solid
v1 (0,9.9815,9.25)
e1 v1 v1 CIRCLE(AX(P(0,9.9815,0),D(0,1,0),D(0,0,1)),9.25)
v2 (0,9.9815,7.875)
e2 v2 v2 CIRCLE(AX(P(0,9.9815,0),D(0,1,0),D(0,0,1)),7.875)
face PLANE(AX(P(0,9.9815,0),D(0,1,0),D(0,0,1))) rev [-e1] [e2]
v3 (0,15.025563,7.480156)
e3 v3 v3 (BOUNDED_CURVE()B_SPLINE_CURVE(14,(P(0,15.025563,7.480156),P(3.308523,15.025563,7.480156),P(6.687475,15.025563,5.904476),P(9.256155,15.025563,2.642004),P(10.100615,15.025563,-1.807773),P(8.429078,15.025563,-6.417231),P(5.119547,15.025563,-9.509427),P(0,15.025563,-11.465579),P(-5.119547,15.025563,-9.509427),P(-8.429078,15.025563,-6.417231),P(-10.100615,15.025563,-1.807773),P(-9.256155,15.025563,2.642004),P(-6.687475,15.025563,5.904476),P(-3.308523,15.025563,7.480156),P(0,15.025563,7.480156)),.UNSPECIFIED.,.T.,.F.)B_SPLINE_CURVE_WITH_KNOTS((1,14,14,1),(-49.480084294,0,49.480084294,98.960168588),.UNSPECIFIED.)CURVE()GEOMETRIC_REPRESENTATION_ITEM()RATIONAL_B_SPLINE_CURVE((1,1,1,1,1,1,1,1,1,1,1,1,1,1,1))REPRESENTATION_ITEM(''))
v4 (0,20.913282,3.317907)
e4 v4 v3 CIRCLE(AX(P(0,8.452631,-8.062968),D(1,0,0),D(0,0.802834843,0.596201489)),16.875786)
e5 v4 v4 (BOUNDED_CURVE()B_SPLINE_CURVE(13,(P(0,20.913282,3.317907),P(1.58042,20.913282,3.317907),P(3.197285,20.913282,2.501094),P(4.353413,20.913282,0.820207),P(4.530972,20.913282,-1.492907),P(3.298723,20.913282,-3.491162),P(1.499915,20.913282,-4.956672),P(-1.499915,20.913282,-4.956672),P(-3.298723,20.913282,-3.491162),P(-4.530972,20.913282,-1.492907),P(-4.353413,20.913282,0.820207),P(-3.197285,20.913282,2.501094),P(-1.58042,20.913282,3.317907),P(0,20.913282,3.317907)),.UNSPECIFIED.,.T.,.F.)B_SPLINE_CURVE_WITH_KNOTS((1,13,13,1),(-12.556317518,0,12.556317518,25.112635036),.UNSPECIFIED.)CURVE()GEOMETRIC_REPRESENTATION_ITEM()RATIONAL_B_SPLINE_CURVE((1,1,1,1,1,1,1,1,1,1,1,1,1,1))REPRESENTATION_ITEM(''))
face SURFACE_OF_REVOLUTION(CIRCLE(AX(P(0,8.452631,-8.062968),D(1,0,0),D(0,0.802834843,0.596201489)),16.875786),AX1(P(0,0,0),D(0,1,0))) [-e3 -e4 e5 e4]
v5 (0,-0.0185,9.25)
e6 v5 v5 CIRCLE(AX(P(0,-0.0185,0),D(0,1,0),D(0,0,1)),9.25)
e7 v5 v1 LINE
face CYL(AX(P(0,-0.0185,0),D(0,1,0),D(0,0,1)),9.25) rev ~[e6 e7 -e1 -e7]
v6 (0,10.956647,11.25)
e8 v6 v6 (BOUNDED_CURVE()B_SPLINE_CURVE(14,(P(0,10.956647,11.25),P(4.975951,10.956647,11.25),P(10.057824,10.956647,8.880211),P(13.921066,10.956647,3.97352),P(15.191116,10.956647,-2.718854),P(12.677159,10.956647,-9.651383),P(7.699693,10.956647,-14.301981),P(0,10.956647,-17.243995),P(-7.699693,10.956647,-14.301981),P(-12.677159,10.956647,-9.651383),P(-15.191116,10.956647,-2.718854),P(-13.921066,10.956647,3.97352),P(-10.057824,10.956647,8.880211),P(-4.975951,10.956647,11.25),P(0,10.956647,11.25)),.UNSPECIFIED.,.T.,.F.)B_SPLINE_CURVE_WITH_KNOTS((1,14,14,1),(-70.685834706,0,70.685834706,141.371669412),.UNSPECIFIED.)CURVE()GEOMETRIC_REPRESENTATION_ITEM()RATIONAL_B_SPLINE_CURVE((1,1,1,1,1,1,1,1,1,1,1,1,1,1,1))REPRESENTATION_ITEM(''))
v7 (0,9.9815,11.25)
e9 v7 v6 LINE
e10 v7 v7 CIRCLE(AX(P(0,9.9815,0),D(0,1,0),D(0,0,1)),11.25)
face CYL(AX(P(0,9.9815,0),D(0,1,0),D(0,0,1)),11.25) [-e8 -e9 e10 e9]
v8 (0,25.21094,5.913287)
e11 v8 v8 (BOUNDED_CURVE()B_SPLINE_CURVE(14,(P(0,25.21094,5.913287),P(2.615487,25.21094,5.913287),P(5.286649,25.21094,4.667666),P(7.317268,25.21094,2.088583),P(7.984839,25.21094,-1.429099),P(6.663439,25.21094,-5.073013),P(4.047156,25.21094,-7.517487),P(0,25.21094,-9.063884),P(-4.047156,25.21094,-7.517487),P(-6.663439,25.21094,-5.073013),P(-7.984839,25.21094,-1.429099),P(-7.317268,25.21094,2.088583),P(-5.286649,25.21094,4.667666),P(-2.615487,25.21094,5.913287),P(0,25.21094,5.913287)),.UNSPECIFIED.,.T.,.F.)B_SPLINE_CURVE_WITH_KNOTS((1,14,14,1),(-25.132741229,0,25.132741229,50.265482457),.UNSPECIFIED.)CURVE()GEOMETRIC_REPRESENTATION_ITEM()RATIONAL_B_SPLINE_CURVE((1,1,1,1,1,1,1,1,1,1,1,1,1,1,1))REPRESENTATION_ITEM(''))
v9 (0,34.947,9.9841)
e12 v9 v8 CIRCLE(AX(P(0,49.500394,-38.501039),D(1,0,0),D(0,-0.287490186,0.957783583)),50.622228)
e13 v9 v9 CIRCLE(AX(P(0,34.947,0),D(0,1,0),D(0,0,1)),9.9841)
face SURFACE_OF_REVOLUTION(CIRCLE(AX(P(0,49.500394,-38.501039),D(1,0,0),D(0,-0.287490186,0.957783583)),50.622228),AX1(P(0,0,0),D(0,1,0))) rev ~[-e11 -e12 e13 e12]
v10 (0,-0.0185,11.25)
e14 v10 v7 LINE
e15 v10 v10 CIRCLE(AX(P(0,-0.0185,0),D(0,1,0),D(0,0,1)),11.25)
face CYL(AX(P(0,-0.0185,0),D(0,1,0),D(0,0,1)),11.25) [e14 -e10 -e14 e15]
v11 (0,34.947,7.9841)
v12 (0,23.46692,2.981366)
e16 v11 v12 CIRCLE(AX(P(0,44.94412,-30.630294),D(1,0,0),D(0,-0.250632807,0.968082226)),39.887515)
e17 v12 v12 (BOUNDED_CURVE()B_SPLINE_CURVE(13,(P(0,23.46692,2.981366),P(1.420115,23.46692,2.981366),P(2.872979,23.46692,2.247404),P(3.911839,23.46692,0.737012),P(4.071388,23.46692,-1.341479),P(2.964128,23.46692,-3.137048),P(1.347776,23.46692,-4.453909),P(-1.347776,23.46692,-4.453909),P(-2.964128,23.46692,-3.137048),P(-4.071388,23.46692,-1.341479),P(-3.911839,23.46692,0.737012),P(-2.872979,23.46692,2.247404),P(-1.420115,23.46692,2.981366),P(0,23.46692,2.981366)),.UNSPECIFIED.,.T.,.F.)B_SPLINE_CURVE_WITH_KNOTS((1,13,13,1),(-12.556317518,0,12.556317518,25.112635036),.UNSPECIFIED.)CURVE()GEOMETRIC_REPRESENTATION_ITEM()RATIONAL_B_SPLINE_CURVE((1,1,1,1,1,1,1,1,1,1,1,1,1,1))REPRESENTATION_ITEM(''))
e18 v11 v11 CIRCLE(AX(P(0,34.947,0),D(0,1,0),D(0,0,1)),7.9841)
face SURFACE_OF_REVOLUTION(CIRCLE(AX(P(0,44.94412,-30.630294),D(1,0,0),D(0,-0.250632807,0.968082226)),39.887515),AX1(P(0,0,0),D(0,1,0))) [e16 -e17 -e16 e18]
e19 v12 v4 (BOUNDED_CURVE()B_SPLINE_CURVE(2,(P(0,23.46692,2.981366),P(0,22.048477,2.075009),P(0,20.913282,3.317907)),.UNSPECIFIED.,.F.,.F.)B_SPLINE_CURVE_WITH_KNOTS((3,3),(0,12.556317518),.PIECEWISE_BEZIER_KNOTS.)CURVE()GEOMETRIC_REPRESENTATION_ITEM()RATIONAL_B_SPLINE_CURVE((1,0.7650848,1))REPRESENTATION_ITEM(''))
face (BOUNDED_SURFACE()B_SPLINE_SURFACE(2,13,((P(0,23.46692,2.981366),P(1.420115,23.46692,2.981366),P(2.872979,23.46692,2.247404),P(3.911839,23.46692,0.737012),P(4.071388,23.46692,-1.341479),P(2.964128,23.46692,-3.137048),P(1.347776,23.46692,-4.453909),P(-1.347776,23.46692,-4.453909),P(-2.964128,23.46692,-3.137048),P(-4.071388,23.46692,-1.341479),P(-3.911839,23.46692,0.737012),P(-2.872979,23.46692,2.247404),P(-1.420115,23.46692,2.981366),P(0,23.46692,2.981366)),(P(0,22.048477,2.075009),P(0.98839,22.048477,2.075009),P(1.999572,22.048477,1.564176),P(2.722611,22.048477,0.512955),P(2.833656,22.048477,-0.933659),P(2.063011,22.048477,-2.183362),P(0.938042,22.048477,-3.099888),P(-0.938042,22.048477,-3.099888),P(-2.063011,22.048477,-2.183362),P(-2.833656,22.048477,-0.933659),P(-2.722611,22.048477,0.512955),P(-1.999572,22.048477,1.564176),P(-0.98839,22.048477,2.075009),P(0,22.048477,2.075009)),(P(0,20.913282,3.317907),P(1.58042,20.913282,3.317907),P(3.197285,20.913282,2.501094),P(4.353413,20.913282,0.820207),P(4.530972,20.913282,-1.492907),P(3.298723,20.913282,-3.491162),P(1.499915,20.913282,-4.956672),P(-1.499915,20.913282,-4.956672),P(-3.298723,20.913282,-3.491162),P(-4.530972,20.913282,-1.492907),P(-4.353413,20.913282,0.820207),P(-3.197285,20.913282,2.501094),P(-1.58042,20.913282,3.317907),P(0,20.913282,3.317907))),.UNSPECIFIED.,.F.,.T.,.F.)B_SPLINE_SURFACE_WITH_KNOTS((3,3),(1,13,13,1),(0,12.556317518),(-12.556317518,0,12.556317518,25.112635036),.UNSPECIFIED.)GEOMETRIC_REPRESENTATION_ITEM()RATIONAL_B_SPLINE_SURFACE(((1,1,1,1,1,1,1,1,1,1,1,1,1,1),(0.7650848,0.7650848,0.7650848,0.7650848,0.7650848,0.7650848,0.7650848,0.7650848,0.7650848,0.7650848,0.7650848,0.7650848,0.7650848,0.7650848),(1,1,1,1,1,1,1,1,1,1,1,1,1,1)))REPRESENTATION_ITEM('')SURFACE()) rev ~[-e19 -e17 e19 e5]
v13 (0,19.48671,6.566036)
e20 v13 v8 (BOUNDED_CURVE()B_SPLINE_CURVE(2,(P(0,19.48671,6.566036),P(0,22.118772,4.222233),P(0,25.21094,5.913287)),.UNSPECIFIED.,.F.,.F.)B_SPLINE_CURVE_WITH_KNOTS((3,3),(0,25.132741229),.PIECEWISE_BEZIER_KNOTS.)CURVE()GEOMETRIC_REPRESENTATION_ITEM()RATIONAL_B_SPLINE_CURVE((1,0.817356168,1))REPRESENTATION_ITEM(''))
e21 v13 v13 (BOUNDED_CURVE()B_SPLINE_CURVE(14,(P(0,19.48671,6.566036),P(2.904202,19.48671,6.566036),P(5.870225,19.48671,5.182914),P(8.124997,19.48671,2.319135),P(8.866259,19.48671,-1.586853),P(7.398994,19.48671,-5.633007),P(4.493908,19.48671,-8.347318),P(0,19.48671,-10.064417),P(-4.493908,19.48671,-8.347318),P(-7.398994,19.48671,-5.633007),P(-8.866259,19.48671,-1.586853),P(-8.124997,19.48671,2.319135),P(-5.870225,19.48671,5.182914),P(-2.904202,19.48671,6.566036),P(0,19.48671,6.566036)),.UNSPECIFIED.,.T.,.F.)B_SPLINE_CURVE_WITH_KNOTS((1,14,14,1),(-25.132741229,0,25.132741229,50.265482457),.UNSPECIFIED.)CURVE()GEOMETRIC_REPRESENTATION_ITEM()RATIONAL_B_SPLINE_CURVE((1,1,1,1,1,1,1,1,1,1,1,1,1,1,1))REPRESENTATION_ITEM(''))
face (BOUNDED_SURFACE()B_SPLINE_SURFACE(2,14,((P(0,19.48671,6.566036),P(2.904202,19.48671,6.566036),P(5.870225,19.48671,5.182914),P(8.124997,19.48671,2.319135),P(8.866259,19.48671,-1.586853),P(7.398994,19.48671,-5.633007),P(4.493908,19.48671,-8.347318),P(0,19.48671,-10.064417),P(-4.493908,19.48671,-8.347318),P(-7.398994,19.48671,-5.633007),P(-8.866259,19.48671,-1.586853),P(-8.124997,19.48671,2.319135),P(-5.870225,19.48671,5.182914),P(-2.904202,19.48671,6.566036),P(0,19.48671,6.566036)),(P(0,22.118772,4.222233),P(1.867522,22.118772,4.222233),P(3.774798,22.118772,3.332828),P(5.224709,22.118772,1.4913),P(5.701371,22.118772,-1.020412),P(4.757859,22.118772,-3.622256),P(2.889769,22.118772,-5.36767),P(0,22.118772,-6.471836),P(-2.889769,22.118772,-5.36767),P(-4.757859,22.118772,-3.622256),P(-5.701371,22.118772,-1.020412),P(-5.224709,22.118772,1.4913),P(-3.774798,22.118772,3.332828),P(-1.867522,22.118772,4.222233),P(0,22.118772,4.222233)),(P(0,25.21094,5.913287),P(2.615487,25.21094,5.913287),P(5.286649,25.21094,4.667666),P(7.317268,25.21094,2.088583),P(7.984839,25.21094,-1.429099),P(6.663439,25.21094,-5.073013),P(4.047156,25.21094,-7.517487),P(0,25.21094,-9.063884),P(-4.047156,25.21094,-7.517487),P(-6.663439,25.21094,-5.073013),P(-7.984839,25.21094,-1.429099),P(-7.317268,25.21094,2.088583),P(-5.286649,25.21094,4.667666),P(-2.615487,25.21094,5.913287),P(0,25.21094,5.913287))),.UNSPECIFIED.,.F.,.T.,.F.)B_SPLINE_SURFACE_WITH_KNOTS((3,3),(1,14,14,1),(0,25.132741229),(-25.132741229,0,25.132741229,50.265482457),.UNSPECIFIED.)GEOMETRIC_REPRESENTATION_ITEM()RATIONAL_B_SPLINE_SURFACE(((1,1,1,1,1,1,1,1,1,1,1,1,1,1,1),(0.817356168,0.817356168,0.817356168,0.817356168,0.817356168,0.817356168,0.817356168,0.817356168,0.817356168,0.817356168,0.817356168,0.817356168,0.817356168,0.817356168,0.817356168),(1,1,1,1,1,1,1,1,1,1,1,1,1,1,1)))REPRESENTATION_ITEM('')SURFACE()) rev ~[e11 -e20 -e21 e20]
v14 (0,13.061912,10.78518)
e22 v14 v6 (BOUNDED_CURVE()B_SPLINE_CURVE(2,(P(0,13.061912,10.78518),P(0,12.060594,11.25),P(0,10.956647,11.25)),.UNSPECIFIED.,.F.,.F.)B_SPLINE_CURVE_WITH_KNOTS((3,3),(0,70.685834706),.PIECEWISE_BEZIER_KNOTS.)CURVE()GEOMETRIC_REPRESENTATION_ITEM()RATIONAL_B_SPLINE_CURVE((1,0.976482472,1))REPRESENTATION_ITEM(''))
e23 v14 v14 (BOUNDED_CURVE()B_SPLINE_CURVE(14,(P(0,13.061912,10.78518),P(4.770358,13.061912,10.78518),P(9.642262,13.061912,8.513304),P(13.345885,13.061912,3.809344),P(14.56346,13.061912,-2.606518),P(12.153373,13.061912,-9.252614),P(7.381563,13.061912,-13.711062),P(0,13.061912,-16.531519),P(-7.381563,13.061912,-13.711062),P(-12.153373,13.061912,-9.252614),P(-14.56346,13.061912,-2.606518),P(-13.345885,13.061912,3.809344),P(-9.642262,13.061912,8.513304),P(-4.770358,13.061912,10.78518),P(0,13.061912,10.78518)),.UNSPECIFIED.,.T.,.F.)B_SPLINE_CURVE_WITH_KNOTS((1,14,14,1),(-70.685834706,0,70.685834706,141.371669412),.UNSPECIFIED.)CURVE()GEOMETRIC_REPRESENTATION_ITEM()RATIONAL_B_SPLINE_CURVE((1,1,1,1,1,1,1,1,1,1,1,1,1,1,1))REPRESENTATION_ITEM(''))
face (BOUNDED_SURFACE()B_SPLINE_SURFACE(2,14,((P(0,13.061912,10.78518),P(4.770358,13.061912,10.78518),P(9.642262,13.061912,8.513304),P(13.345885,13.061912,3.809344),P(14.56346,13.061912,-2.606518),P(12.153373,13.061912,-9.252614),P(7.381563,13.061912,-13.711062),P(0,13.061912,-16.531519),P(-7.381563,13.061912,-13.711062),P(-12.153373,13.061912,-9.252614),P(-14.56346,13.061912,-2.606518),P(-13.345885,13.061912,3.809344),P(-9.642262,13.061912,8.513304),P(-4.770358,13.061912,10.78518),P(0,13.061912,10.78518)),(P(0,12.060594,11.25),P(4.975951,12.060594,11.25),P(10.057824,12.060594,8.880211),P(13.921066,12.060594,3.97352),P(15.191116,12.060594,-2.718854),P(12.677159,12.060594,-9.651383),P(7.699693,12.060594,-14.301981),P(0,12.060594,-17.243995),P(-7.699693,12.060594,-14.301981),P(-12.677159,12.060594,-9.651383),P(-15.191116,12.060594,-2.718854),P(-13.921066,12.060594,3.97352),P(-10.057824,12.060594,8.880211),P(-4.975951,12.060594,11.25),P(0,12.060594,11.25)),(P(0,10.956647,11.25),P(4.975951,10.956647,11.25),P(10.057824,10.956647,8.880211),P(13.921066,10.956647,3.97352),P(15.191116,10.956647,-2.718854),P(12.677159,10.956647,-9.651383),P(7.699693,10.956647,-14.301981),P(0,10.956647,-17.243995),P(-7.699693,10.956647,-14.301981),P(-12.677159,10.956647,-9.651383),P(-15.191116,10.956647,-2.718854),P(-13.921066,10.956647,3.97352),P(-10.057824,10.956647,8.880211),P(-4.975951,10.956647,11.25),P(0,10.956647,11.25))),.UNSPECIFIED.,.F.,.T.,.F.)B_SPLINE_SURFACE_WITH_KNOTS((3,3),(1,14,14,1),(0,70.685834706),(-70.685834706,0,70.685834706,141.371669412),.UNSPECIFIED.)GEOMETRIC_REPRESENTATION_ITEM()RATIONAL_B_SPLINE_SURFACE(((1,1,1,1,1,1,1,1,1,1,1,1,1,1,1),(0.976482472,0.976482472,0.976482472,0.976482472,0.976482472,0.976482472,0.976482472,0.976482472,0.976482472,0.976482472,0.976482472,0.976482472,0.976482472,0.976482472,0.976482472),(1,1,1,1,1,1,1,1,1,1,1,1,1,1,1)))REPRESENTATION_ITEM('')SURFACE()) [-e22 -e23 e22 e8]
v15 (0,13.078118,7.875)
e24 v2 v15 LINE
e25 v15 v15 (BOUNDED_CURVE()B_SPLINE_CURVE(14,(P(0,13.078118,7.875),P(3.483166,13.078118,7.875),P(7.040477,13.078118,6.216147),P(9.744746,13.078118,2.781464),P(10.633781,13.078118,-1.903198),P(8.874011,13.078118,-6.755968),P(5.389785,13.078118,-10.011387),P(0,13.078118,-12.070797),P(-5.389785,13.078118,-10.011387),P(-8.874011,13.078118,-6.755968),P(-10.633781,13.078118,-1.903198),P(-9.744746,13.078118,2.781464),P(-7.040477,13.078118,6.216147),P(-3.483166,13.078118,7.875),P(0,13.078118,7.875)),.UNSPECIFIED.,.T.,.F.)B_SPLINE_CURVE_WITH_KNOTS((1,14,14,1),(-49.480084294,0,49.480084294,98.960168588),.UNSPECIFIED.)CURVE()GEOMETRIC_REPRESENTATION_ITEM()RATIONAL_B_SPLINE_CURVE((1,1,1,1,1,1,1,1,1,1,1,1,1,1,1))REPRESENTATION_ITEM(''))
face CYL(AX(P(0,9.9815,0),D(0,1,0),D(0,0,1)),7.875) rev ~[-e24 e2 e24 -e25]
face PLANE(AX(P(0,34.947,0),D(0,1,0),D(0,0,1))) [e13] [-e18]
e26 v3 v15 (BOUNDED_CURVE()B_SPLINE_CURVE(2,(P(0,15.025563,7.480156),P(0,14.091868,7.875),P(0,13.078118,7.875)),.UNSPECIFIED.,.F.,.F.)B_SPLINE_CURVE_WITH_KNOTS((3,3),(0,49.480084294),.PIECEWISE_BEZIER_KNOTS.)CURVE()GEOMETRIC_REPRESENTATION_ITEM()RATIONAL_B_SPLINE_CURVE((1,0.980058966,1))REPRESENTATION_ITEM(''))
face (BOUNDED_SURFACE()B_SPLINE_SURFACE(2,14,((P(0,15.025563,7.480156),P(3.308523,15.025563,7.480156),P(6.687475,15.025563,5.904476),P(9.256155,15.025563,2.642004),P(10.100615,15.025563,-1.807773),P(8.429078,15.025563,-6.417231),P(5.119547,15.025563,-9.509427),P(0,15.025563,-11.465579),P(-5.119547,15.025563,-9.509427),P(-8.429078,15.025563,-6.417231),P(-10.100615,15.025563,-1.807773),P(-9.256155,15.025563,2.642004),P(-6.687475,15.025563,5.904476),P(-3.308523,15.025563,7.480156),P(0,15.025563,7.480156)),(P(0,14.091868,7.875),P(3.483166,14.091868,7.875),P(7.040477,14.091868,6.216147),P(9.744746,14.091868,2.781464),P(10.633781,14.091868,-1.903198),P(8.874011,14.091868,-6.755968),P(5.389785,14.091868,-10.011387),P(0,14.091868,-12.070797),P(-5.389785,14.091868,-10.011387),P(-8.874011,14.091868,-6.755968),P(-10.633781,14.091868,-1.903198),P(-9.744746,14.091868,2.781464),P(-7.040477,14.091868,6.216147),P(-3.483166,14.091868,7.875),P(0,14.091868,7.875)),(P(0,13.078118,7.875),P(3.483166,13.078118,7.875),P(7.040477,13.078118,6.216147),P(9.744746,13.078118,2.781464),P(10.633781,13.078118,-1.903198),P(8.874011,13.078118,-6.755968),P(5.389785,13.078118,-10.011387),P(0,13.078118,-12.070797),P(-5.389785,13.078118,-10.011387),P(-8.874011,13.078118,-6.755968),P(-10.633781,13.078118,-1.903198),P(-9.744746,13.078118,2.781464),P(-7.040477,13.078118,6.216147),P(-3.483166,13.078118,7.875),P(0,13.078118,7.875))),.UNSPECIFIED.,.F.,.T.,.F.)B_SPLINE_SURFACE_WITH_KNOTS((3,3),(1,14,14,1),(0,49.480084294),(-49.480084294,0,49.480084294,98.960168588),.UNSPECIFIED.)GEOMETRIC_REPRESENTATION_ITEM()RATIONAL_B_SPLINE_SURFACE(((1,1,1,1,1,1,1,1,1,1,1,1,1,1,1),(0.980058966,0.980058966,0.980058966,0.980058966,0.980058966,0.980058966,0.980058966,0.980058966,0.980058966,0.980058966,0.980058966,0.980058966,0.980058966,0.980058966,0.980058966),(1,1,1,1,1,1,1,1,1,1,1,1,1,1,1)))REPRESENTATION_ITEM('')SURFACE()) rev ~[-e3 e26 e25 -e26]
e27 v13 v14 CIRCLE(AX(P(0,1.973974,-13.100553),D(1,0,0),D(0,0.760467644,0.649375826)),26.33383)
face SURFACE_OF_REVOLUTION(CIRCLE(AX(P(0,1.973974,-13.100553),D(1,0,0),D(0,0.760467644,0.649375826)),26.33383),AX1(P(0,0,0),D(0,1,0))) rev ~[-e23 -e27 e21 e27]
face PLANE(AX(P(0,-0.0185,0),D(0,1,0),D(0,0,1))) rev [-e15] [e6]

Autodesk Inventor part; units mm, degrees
ref_plane "YZ Plane" through (0, 0, 0) normal (1, 0, 0) x (0, 1, 0)
ref_plane "XZ Plane" through (0, 0, 0) normal (0, 1, 0) x (-1, 0, 0)
ref_plane "XY Plane" through (0, 0, 0) normal (0, 0, 1) x (1, 0, 0)
sketch "Sketch1" plane through (0, 0, 0) normal (1, 0, 0) x (0, 1, 0)
  line L0 (9.25, 0.0185) -> (9.25, -9.9815)
  line L1 (9.25, 0.0185) -> (11.25, 0.0185)
  line L2 (11.25, 0.0185) -> (11.25, -9.9815)
  line L3 (11.25, -9.9815) -> (11.25, -12)
  arc A0 (1.9984, -22.0011) -> (7.875, -14) centre (-8.063, -8.4526) ccw
  arc A1 (7.9841, -34.947) -> (1.9984, -22.0011) centre (-30.628, -44.9433) ccw
  line L4 (9.9841, -34.947) -> (7.9841, -34.947)
  arc A2 (4, -22) -> (11.25, -12) centre (-13.1002, -1.9743) ccw
  arc A3 (9.9841, -34.947) -> (4, -22) centre (-38.5, -49.5) ccw
  line L5 (7.875, -9.9815) -> (9.25, -9.9815)
  line L6 (7.875, -9.9815) -> (7.875, -14)
  line L7 (0, 0) -> (0, -36)
  dimension "d26" = 9.25
  dimension "d28" = 2
  dimension "d36" = 10
  dimension "d37" = 34.9656
  dimension "d57" = 36
revolve "Revolution1" add sketch "Sketch1" angle 360 about axis through (0, 0, 0) along (0, 0, -1)
move or copy body "Move Body1" bodies to move or copy 1 copy no rotation origin (0, 0, 0) rotation axis (1, 0, 0) rotation angle 90
fillet "Fillet6" radius 2 1 edges at (0, 22.0011, -1.9984)
fillet "Fillet7" radius 5 1 edges at (0, 14, -7.875)
fillet "Fillet8" radius 5 1 edges at (0, 12, -11.25)
fillet "Fillet9" radius 5 1 edges at (0, 22, -4)
properties part number "nozzle" material "ABS Plastic"
